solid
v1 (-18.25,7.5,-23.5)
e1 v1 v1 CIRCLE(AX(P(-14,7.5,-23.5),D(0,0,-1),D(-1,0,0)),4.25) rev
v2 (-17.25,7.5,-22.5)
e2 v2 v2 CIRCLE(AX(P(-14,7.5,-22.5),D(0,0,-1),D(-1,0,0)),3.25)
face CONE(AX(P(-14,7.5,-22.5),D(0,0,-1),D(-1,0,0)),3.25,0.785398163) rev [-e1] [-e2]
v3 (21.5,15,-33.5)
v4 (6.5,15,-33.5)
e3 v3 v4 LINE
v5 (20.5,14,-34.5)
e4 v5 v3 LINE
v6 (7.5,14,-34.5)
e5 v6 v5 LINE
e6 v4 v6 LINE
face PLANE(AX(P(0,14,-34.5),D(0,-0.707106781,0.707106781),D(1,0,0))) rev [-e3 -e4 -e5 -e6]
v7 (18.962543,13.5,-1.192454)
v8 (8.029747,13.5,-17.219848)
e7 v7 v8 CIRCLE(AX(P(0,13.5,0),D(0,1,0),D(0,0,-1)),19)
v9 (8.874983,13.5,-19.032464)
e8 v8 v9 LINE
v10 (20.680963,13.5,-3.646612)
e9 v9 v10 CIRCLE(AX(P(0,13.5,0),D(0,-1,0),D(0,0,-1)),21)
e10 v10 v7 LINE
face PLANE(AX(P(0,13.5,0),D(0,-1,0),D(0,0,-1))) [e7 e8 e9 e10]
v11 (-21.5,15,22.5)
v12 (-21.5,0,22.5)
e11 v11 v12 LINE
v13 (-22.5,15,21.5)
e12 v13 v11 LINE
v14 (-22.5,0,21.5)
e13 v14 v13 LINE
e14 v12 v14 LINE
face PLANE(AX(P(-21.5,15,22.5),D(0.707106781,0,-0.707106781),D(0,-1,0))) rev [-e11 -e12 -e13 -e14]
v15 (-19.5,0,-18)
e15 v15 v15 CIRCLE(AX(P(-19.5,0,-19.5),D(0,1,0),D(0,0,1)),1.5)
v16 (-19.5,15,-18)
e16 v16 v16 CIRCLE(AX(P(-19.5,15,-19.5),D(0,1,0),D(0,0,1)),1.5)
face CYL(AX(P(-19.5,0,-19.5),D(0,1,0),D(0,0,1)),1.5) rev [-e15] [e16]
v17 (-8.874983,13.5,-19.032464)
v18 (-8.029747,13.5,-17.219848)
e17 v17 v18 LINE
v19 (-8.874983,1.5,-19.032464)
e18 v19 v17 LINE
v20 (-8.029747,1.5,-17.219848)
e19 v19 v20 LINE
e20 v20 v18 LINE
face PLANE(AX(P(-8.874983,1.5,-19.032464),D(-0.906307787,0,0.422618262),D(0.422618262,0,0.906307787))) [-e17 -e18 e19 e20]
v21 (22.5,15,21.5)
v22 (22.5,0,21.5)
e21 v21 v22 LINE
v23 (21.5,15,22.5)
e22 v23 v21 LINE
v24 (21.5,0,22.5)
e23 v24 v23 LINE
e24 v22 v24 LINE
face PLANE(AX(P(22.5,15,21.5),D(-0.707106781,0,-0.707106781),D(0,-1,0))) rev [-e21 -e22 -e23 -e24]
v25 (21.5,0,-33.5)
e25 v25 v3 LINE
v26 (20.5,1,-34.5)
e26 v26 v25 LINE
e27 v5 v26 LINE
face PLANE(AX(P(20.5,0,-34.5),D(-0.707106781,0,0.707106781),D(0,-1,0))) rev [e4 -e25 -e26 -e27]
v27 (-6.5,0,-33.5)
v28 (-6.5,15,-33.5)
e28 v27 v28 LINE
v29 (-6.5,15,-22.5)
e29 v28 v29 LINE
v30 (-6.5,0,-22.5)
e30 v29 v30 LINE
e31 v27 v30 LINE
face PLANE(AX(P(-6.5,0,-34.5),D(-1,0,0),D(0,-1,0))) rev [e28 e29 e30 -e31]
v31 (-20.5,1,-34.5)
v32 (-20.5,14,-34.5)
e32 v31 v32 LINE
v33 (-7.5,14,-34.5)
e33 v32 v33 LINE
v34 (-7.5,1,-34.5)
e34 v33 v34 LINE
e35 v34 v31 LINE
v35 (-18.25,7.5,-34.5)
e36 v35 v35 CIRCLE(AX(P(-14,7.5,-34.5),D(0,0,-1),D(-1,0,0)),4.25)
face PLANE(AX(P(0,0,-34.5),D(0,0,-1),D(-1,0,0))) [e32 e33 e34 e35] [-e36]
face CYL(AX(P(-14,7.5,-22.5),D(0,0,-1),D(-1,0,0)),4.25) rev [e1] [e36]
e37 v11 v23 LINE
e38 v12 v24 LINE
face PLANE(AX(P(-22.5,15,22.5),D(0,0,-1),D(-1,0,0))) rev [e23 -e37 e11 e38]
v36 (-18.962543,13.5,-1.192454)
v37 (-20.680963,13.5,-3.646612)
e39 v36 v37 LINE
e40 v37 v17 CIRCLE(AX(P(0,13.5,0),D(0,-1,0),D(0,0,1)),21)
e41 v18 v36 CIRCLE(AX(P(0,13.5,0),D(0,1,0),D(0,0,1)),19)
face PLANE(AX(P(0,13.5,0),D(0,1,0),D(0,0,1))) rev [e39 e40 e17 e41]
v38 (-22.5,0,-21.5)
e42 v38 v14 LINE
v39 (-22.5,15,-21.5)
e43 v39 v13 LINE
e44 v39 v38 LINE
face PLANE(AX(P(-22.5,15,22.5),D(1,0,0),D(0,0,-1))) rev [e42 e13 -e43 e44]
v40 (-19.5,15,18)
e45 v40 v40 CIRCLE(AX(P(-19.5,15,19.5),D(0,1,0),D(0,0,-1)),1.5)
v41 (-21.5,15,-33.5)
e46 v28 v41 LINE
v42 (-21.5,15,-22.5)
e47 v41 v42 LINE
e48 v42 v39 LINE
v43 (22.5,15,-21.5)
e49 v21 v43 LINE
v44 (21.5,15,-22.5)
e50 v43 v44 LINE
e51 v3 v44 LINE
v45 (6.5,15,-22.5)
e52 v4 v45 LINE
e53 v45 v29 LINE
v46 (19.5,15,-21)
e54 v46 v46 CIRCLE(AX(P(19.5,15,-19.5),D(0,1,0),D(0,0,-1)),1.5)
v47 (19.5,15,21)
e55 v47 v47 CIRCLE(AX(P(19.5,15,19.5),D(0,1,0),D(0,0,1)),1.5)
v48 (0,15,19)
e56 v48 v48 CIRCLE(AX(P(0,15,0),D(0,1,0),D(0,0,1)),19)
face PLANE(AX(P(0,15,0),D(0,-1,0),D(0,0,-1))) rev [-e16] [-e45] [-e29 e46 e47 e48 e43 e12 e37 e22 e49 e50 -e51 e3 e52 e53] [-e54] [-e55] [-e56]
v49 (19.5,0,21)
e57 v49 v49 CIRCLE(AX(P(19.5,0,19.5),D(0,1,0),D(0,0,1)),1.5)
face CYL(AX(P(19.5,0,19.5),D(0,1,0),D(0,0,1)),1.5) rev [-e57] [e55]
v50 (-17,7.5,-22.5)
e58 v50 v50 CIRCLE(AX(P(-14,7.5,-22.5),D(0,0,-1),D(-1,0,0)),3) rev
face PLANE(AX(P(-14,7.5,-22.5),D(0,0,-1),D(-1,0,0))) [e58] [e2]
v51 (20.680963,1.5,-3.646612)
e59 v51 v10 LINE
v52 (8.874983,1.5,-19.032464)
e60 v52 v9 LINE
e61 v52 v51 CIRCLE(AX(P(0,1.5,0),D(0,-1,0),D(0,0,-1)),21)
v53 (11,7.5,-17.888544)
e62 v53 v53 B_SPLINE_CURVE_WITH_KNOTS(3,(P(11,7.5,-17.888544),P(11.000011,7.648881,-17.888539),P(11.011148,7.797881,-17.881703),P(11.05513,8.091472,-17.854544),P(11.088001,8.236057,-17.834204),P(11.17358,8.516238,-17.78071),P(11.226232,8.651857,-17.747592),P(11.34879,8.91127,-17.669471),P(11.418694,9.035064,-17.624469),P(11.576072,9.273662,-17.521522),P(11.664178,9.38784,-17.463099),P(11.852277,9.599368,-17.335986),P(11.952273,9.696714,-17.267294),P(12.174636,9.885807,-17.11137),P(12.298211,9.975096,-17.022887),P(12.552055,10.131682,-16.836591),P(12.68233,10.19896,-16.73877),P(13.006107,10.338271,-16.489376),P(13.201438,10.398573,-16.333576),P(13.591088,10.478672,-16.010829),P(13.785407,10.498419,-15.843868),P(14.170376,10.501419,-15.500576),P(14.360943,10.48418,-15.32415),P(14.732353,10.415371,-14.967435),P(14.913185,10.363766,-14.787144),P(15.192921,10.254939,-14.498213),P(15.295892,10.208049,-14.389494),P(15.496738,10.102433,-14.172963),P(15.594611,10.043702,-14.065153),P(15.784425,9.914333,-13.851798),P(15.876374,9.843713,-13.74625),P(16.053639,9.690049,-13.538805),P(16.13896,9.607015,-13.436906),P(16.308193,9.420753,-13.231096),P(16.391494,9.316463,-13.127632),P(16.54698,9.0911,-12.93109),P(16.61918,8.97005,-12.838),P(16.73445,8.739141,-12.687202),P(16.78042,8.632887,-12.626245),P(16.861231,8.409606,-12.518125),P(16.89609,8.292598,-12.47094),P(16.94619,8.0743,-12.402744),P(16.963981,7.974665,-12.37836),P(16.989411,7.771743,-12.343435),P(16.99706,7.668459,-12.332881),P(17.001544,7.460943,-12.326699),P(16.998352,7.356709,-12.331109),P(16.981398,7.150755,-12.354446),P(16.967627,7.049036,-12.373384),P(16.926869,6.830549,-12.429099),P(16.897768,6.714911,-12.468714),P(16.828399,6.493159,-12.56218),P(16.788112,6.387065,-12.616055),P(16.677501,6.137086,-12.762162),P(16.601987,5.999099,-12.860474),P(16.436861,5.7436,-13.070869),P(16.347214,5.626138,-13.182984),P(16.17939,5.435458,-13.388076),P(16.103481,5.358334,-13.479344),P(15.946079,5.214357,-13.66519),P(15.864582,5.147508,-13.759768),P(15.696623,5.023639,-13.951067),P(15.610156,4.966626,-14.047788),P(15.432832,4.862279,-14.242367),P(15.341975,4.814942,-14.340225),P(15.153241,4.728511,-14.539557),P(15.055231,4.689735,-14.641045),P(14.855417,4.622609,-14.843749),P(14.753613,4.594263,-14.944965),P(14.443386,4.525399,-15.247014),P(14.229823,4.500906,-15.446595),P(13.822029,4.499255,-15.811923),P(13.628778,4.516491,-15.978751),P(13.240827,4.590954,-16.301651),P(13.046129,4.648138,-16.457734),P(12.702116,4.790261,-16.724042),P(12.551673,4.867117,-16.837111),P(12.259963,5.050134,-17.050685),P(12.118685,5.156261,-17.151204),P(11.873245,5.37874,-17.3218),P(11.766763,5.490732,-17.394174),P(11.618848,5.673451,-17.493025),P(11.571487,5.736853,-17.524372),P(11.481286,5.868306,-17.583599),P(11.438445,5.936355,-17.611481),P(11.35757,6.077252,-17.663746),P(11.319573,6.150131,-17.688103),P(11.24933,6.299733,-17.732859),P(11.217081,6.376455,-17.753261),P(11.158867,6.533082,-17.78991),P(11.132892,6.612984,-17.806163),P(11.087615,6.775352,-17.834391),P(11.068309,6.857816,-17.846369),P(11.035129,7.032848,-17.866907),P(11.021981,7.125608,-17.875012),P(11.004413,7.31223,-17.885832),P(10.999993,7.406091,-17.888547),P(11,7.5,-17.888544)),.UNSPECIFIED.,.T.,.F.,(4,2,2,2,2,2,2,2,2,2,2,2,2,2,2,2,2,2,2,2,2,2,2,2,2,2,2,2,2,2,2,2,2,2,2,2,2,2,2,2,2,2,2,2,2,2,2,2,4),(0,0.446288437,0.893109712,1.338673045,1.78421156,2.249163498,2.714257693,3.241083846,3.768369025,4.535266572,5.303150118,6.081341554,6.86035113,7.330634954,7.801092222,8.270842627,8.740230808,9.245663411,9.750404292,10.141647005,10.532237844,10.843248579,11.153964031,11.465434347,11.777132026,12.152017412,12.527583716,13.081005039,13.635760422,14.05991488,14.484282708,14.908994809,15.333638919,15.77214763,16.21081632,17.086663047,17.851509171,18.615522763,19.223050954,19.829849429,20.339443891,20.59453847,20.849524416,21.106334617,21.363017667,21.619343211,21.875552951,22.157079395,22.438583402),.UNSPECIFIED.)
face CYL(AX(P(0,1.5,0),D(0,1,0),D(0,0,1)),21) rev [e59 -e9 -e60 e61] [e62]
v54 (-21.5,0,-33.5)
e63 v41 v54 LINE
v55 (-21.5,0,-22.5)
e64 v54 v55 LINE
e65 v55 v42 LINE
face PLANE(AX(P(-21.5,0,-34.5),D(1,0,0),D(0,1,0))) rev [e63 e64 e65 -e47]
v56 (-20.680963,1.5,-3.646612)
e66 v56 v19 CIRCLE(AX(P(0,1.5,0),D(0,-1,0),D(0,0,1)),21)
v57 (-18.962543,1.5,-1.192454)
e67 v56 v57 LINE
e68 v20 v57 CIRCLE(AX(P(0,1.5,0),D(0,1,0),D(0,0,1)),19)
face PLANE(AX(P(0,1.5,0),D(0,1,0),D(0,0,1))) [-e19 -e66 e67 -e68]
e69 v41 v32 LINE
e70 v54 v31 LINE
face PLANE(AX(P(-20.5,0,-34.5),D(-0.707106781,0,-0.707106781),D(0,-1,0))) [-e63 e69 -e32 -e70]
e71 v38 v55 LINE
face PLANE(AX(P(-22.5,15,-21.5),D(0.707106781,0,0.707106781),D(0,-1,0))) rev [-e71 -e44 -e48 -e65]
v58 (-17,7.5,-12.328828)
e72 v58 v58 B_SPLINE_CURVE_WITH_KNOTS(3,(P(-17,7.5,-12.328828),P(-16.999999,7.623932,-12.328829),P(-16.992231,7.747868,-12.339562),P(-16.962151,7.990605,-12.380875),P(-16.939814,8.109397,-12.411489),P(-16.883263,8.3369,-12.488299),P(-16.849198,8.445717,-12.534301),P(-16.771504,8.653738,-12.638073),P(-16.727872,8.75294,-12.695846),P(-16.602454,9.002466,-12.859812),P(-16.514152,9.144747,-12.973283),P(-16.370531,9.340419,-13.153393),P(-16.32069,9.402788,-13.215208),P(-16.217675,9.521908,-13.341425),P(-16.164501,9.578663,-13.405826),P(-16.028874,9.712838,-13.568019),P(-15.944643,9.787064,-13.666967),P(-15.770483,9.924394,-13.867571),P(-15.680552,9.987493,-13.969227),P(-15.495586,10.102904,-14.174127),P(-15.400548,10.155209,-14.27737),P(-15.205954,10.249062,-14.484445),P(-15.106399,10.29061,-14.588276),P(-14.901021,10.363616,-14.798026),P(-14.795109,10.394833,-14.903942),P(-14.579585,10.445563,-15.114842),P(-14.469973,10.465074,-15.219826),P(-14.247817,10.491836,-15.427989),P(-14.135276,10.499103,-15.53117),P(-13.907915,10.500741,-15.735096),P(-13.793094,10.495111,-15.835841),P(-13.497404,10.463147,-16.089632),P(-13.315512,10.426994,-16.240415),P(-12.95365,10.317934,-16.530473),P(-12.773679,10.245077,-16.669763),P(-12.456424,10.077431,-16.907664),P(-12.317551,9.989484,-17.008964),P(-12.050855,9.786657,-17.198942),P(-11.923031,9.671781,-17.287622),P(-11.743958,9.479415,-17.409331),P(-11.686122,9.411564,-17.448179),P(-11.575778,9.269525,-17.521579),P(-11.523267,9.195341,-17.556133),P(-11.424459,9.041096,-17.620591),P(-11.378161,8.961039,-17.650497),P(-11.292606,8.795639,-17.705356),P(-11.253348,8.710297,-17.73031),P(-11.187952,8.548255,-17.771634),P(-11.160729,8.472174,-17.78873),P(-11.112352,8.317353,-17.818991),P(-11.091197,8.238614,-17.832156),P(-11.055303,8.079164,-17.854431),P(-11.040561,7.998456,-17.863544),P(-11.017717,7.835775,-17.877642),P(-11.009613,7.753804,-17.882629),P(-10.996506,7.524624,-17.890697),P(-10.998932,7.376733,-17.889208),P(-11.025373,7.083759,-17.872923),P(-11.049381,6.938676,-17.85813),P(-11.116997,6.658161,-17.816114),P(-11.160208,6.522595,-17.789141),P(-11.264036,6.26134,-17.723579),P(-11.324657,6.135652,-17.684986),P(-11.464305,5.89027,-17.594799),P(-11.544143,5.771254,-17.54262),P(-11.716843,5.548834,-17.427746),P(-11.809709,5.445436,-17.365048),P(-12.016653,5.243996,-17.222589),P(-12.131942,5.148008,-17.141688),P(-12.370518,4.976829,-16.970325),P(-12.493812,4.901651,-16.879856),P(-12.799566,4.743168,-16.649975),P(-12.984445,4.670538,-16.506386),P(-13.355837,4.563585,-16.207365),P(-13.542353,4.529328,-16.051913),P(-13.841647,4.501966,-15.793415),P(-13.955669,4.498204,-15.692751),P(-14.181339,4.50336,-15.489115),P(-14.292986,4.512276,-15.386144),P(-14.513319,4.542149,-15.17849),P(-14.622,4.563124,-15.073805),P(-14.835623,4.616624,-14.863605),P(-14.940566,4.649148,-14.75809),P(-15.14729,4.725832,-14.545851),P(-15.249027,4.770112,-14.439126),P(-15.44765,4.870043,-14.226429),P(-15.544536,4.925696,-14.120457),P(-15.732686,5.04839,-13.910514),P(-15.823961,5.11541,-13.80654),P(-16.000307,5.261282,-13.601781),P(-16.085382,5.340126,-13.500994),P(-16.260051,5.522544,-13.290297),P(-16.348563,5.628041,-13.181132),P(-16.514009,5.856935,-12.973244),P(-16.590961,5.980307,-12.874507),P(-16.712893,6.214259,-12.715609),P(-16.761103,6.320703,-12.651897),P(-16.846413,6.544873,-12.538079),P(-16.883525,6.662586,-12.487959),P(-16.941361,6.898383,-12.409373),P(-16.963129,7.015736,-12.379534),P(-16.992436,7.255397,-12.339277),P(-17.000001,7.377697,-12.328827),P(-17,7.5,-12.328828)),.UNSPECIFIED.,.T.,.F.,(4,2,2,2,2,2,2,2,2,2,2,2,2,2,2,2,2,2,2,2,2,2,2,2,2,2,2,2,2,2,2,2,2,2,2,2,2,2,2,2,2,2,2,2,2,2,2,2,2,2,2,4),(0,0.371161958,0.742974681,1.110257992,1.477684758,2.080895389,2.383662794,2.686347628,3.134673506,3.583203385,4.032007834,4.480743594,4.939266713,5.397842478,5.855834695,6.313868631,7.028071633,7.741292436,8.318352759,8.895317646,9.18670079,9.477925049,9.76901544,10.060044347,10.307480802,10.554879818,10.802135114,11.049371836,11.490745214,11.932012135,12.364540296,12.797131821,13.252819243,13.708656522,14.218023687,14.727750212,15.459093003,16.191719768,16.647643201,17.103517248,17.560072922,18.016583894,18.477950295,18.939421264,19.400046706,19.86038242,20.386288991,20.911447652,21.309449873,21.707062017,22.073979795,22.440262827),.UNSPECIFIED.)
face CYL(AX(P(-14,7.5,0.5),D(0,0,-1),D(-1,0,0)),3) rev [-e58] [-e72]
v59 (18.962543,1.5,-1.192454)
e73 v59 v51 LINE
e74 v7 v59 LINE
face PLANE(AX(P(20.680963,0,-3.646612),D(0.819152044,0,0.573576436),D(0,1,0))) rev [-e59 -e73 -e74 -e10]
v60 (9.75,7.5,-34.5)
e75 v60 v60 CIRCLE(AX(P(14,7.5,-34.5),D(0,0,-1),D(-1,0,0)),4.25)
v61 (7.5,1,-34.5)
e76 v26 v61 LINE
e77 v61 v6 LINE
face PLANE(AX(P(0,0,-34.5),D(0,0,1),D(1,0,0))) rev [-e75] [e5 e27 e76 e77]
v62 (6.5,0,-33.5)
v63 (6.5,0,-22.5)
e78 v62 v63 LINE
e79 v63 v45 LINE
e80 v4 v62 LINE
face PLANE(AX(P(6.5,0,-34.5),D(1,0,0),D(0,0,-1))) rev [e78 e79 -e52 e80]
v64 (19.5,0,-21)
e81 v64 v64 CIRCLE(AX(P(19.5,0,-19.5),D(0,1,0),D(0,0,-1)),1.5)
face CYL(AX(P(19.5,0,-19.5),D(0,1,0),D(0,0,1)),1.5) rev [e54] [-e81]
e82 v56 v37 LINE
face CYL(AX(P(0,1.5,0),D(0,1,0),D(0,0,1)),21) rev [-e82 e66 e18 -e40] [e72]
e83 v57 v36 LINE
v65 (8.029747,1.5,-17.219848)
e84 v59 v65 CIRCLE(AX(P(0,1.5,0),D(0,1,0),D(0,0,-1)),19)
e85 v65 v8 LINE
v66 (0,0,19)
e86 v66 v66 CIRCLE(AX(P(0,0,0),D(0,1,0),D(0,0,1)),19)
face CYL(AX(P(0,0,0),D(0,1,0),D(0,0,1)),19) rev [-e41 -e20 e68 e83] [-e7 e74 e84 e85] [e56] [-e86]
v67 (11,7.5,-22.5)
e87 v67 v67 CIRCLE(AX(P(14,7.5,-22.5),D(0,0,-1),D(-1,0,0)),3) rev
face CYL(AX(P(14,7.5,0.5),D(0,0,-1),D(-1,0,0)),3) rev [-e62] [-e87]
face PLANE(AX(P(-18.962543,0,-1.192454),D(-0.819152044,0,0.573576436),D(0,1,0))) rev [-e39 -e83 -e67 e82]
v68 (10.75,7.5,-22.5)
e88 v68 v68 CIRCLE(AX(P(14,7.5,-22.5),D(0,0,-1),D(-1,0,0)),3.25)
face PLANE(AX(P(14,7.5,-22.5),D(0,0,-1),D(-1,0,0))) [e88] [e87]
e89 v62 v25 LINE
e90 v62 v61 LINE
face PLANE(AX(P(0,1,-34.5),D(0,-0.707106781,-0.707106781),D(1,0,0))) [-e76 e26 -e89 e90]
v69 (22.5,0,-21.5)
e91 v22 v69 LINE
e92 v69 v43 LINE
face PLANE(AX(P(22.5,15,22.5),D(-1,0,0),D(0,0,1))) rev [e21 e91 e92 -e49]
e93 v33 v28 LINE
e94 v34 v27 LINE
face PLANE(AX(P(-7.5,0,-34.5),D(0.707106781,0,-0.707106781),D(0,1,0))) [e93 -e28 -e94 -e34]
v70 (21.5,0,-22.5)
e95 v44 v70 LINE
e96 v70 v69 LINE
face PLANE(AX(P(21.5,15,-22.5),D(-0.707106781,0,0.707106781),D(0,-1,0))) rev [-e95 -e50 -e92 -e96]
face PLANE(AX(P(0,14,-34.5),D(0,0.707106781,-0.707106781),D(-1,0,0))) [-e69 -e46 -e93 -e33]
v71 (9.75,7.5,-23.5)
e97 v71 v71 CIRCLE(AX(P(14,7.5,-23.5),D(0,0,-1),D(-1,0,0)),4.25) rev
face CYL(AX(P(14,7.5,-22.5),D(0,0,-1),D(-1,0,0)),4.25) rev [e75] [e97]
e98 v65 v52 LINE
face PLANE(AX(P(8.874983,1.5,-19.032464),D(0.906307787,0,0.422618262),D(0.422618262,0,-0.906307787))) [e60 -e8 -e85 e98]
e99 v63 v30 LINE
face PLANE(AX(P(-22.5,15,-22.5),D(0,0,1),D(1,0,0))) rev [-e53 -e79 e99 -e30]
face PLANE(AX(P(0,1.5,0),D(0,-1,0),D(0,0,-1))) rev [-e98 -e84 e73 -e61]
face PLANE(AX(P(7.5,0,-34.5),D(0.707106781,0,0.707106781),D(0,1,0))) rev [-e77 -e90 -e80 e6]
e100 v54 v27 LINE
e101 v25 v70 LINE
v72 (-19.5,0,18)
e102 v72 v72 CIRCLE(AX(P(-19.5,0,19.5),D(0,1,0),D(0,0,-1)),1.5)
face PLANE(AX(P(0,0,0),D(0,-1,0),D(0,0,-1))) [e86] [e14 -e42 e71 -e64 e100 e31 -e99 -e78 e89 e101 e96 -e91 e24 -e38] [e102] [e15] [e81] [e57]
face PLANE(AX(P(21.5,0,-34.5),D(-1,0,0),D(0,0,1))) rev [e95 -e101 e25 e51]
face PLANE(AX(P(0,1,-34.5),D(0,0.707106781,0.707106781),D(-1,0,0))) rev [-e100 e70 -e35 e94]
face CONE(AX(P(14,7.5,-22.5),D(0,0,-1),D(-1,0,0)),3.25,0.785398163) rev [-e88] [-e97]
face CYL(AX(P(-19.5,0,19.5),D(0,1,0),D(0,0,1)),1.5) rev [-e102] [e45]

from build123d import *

# Parameters (mm, degrees)
SKETCH_1_W               = 45
SKETCH_1_H               = 45
EXTRUDE_1_DEPTH          = 15
SKETCH_2_R               = 19
CUT_EXTRUDE_1_DEPTH      = 36.178118199
SKETCH_5_W               = 15
SKETCH_5_H               = 15
EXTRUDE_2_DEPTH          = 12
SKETCH_6_R               = 3
CUT_EXTRUDE_4_DEPTH      = 35
SKETCH_7_R               = 1.5
CUT_EXTRUDE_5_DEPTH      = 44.834917702
CUT_EXTRUDE_6_DEPTH      = 6
CUT_EXTRUDE_6_DEPTH_BACK = 6
SKETCH_9_R               = 4.25
CUT_EXTRUDE_7_DEPTH      = 12
CHAMFER_1_SIZE           = 2
CHAMFER_2_SIZE           = 1
CHAMFER_3_SIZE           = 1
CHAMFER_4_SIZE           = 1


# Some blends are built 0.0001 mm under size
with BuildPart() as part:
    # 草图1 → 凸台-拉伸1 (new body)
    with BuildSketch(Plane(origin=(0, 0, 0), x_dir=(1, 0, 0), z_dir=(0, 1, 0))):
        Rectangle(SKETCH_1_W, SKETCH_1_H)
    extrude(amount=EXTRUDE_1_DEPTH)

    # 草图2 → 切除-拉伸1 (cut, through all)
    with BuildSketch(Plane(origin=(0, 15, 0), x_dir=(1, 0, 0), z_dir=(0, 1, 0))):
        with Locations(Location((0, 0, 0), (0, 0, 270))):
            Circle(SKETCH_2_R)
    extrude(amount=-CUT_EXTRUDE_1_DEPTH, mode=Mode.SUBTRACT)

    # 草图5 → 凸台-拉伸2 (add)
    with BuildSketch(Plane(origin=(0, 0, -22.5), x_dir=(-1, 0, 0), z_dir=(0, 0, -1))):
        with Locations((14, 7.5)):
            Rectangle(SKETCH_5_W, SKETCH_5_H)
        with Locations((-14, 7.5)):
            Rectangle(SKETCH_5_W, SKETCH_5_H)
    extrude(amount=EXTRUDE_2_DEPTH)

    # 草图6 → 切除-拉伸4 (cut)
    with BuildSketch(Plane(origin=(0, 0, -34.5), x_dir=(-1, 0, 0), z_dir=(0, 0, -1))):
        with Locations((-14, 7.5)):
            Circle(SKETCH_6_R)
        with Locations((14, 7.5)):
            Circle(SKETCH_6_R)
    extrude(amount=-CUT_EXTRUDE_4_DEPTH, mode=Mode.SUBTRACT)

    # 草图7 → 切除-拉伸5 (cut, through all)
    with BuildSketch(Plane(origin=(0, 15, 0), x_dir=(1, 0, 0), z_dir=(0, 1, 0))):
        with Locations(Location((-19.5, 19.5, 0), (0, 0, 270))):
            Circle(SKETCH_7_R)
        with Locations(Location((19.5, 19.5, 0), (0, 0, 90))):
            Circle(SKETCH_7_R)
        with Locations(Location((19.5, -19.5, 0), (0, 0, 270))):
            Circle(SKETCH_7_R)
        with Locations(Location((-19.5, -19.5, 0), (0, 0, 90))):
            Circle(SKETCH_7_R)
    extrude(amount=-CUT_EXTRUDE_5_DEPTH, mode=Mode.SUBTRACT)

    # 草图8 → 切除-拉伸6 (cut, two sides: drawn at the far end of the back side and taken through both)
    with BuildSketch(Plane(origin=(0, 7.5, 0), x_dir=(-1, 0, 0), z_dir=(0, -1, 0)).offset(-CUT_EXTRUDE_6_DEPTH_BACK)):
        with BuildLine():
            Line((-8.874983497, 19.032463528), (-8.029746973, 17.219847954))
            ThreePointArc((-8.029746973, 17.219847954), (-15.073713466, 11.566467151), (-18.711347307, 3.299315376))
            Line((-18.711347307, 3.299315376), (-20.680962813, 3.646611731))
            ThreePointArc((-20.680962813, 3.646611731), (-16.660420146, 12.783990009), (-8.874983497, 19.032463528))
        make_face()
        with BuildLine():
            Line((20.680962813, 3.646611731), (18.711347307, 3.299315376))
            ThreePointArc((18.711347307, 3.299315376), (15.073713466, 11.566467151), (8.029746973, 17.219847954))
            Line((8.029746973, 17.219847954), (8.874983497, 19.032463528))
            ThreePointArc((8.874983497, 19.032463528), (16.660420146, 12.783990009), (20.680962813, 3.646611731))
        make_face()
    extrude(amount=CUT_EXTRUDE_6_DEPTH + CUT_EXTRUDE_6_DEPTH_BACK, mode=Mode.SUBTRACT)

    # 草图9 → 切除-拉伸7 (cut)
    with BuildSketch(Plane(origin=(0, 0, -34.5), x_dir=(-1, 0, 0), z_dir=(0, 0, -1))):
        with Locations((-14, 7.5)):
            Circle(SKETCH_9_R)
        with Locations((14, 7.5)):
            Circle(SKETCH_9_R)
    extrude(amount=-CUT_EXTRUDE_7_DEPTH, mode=Mode.SUBTRACT)

    # 倒角1
    # the kernel refuses this chamfer: 2 mm, written as the material it takes off along each edge
    with BuildSketch(Plane(origin=(-18.711347307, 1.5, -3.299315376), x_dir=(-0.11838916494267775, 0, 0.9929672731888879), z_dir=(0, 1, 0)), Plane(origin=(18.711347307, 13.5, -3.299315376), x_dir=(0.11838916494267755, 0, 0.9929672731888879), z_dir=(0, -1, 0))) as chamfer_1_piece_1:
        with BuildLine():
            Line((2.121782819, 0), (-CHAMFER_1_SIZE * 0.055836389964, -CHAMFER_1_SIZE * 0.998439931872))
            Line((-CHAMFER_1_SIZE * 0.055836389964, -CHAMFER_1_SIZE * 0.998439931872), (0, 0))
            ThreePointArc((0, 0), (1.090799435, -0.029617755), (2.121782819, 0))
        make_face()
    extrude(amount=12, mode=Mode.SUBTRACT)

    # 倒角2
    chamfer_2_edges = [part.edges().sort_by_distance(p)[0] for p in [
        (22.5, 7.5, 22.5),
        (-22.5, 7.5, 22.5),
        (-22.5, 7.5, -22.5),
        (22.5, 7.5, -22.5),
    ]]
    chamfer(chamfer_2_edges, length=CHAMFER_2_SIZE - 0.0001)  # a hair under: the kernel refuses the full size

    # 倒角3
    chamfer_3_edges = [part.edges().sort_by_distance(p)[0] for p in [
        (18.25, 7.5, -22.5),
        (-9.75, 7.5, -22.5),
    ]]
    chamfer(chamfer_3_edges, length=CHAMFER_3_SIZE)

    # 倒角4
    chamfer_4_edges = [part.edges().sort_by_distance(p)[0] for p in [
        (6.5, 7.5, -34.5),
        (14, 15, -34.5),
        (21.5, 7.5, -34.5),
        (14, 0, -34.5),
        (-21.5, 7.5, -34.5),
        (-14, 15, -34.5),
        (-6.5, 7.5, -34.5),
        (-14, 0, -34.5),
    ]]
    chamfer(chamfer_4_edges, length=CHAMFER_4_SIZE)


solid = part.part
